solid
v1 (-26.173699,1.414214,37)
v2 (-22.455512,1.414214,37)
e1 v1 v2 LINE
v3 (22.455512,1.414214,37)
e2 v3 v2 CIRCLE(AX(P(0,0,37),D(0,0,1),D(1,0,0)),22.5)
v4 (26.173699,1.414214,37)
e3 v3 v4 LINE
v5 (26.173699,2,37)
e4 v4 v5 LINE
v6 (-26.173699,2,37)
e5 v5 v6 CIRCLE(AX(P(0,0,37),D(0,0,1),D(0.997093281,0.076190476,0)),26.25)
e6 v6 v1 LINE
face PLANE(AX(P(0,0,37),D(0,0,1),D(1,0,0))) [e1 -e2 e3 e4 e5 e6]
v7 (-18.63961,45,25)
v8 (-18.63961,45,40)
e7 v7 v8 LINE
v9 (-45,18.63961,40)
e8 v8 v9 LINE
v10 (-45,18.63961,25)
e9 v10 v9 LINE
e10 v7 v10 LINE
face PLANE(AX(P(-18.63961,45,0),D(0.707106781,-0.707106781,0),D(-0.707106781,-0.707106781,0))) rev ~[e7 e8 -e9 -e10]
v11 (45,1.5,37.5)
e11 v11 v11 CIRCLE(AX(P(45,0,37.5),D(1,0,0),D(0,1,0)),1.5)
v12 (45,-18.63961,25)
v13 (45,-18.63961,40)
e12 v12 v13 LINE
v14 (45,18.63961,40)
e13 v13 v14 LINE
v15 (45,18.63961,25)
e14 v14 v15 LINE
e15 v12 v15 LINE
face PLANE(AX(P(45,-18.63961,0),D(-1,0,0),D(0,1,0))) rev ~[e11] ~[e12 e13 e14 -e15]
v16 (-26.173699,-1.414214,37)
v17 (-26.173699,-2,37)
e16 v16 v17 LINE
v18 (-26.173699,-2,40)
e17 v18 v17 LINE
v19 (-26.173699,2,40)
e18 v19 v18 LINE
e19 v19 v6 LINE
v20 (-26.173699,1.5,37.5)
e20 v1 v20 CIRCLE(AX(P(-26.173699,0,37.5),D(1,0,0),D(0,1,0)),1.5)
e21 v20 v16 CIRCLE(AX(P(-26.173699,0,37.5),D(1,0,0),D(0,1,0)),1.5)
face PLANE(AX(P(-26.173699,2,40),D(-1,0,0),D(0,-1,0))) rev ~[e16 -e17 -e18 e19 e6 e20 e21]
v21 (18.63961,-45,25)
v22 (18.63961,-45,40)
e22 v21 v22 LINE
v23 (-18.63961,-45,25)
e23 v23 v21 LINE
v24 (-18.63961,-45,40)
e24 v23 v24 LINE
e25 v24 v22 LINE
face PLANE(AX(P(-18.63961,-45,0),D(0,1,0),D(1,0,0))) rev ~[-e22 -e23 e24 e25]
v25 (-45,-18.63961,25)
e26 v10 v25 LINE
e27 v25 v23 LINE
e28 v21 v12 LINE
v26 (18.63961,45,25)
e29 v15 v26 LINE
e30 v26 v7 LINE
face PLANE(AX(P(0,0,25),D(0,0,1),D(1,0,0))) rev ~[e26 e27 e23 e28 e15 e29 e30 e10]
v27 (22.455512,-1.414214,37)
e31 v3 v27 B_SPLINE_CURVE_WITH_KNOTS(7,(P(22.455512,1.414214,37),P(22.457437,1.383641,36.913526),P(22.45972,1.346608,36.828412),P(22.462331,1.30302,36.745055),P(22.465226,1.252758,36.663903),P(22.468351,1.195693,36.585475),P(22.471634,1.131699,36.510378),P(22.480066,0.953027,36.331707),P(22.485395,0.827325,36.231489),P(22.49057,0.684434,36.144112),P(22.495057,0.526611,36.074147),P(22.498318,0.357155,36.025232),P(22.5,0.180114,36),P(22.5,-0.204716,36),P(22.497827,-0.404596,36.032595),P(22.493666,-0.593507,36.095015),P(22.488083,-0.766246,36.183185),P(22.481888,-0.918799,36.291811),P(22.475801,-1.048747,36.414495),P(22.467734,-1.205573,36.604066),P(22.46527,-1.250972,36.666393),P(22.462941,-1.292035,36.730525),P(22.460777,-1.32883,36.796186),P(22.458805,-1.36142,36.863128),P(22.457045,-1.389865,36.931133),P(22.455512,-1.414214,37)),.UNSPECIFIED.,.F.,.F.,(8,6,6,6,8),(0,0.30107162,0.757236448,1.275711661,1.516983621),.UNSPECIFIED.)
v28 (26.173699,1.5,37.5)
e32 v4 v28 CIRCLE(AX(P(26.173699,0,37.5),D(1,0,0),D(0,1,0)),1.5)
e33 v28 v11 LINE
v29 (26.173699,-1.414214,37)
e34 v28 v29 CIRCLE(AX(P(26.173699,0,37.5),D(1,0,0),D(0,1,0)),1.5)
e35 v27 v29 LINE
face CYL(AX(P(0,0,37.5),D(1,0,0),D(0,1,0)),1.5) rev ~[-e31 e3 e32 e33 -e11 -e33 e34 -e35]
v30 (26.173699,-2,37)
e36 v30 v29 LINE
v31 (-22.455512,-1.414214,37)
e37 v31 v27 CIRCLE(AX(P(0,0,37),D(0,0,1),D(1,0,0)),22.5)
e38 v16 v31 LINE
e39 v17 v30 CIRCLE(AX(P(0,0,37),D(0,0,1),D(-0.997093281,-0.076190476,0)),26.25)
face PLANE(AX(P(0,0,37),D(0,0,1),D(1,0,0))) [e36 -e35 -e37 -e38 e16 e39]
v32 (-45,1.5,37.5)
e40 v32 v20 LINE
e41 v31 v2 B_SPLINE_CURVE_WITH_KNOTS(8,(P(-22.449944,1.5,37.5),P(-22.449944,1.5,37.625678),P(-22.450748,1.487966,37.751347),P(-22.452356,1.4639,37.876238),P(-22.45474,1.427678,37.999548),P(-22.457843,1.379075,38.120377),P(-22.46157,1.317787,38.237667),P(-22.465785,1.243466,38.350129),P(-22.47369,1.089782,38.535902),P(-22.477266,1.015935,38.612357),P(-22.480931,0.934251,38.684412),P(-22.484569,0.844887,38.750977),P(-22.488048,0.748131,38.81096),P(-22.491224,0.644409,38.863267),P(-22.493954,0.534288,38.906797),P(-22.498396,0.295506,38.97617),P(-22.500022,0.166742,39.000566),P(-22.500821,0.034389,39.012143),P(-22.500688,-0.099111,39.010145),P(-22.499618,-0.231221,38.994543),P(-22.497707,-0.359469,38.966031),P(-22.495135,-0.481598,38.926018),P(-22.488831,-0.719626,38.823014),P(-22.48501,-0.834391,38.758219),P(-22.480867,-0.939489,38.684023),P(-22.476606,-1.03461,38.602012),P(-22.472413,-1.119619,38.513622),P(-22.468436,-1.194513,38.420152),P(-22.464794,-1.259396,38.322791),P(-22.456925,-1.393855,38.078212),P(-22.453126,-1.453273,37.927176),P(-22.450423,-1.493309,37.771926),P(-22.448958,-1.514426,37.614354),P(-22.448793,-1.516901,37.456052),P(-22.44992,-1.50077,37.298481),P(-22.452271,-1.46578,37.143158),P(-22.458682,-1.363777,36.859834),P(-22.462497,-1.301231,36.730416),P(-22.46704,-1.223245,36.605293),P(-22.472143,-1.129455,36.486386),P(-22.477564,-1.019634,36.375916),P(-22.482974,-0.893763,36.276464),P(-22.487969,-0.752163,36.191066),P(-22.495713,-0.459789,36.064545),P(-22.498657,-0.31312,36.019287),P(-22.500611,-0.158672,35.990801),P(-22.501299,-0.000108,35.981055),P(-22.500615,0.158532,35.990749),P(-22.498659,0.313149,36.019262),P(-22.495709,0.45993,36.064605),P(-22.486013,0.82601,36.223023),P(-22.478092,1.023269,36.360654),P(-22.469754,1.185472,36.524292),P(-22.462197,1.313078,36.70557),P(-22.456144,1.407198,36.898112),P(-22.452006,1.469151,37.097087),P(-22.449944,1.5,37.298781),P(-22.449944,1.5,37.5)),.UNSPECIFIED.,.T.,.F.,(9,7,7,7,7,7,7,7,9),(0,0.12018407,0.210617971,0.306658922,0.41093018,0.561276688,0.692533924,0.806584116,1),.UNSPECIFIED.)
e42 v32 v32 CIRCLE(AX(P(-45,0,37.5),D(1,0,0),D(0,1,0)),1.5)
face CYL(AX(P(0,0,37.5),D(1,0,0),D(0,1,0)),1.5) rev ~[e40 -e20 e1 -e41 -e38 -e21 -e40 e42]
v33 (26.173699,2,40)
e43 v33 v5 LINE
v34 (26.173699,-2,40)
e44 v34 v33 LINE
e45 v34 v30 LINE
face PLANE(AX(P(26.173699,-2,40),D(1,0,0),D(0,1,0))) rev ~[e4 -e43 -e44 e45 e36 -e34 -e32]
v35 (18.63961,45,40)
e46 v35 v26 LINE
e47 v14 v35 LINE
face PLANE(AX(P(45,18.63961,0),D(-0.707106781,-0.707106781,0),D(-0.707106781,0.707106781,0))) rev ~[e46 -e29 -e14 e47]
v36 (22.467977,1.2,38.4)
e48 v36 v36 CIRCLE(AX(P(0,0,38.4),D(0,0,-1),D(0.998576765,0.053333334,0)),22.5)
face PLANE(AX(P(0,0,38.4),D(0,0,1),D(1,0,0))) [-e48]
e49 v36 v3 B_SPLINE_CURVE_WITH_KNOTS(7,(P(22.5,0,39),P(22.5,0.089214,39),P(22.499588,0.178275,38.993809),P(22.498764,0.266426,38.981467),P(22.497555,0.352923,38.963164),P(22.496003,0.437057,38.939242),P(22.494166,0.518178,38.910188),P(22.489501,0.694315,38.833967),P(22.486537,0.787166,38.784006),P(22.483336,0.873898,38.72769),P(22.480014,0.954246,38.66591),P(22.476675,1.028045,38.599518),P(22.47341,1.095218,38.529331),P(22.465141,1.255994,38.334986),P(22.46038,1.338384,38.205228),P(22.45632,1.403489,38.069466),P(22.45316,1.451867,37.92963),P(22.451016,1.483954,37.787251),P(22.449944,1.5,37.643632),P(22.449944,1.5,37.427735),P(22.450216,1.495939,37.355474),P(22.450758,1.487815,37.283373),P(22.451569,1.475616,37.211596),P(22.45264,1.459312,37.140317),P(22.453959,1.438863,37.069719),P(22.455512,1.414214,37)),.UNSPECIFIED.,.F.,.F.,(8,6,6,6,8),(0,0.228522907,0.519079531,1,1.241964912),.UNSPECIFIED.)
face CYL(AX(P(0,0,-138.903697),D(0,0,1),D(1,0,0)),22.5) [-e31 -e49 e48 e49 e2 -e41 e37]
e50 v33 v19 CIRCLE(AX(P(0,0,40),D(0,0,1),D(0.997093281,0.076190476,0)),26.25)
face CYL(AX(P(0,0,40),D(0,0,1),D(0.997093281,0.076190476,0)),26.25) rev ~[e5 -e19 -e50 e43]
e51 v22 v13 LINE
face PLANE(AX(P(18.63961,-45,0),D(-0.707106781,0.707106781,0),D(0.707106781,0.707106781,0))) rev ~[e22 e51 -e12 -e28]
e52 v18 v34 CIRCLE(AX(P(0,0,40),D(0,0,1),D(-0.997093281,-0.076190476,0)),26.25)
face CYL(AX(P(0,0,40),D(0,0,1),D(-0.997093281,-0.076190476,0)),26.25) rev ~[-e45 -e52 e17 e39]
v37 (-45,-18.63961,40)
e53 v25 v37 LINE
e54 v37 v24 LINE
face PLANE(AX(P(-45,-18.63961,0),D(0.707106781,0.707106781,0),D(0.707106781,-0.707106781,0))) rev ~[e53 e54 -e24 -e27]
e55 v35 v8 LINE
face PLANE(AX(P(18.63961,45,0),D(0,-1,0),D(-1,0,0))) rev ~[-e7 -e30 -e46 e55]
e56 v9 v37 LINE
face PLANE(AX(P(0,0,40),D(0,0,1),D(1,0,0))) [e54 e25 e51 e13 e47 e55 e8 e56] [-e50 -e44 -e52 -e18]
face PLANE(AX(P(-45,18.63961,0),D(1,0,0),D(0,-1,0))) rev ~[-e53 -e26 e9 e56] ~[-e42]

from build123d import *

# Parameters (mm, degrees)
F1_DEPTH       = 40
F2_R           = 22.5
F3_DEPTH       = 3
F5_DEPTH       = 25
F6_DEPTH       = 25
F7_DEPTH       = 25
F8_R           = 1.5
F9_DEPTH       = 110
F10_END_RADIUS = 22.5
F10_REACH      = 49.2436407871
F11_END_RADIUS = 22.5
F11_REACH      = 49.2436407871
F12_DEPTH      = 1.6


with BuildPart() as f1:
    # F0 (on Top) → F1 (new body)
    with BuildSketch(Plane.XY):
        Polygon((18.6396103068, 45), (-18.6396103068, 45), (-45, 18.6396103068), (-45, -18.6396103068), (-18.6396103068, -45), (18.6396103068, -45), (45, -18.6396103068), (45, 18.6396103068), align=None)
    extrude(amount=F1_DEPTH)

    # F2 (on face) → F3 (cut)
    with BuildSketch(Plane.XY.offset(40)):
        with BuildLine():
            Line((-26.1736986305, 2), (-26.1736986305, -2))
            ThreePointArc((-26.1736986305, -2), (0, -26.25), (26.1736986305, -2))
            Line((26.1736986305, -2), (26.1736986305, 2))
            ThreePointArc((26.1736986305, 2), (0, 26.25), (-26.1736986305, 2))
        make_face()
        Circle(F2_R, mode=Mode.SUBTRACT)
    extrude(amount=-F3_DEPTH, mode=Mode.SUBTRACT)

    # F4 (on face) → F5 (join)
    with BuildSketch(Plane.XY):
        Polygon((-18.6396103068, -45), (18.6396103068, -45), (45, -18.6396103068), (45, 18.6396103068), (18.6396103068, 45), (-18.6396103068, 45), (-45, 18.6396103068), (-45, -18.6396103068), align=None)
    extrude(amount=F5_DEPTH)

    # F0 (on Top) → F6 (join)
    with BuildSketch(Plane.XY):
        Polygon((18.6396103068, 45), (-18.6396103068, 45), (-45, 18.6396103068), (-45, -18.6396103068), (-18.6396103068, -45), (18.6396103068, -45), (45, -18.6396103068), (45, 18.6396103068), align=None)
    extrude(amount=F6_DEPTH)

    # F0 (on Top) → F7 (cut)
    with BuildSketch(Plane.XY):
        Polygon((18.6396103068, 45), (-18.6396103068, 45), (-45, 18.6396103068), (-45, -18.6396103068), (-18.6396103068, -45), (18.6396103068, -45), (45, -18.6396103068), (45, 18.6396103068), align=None)
    extrude(amount=F7_DEPTH, mode=Mode.SUBTRACT)

    # F8 (on Right) → F9 (cut, symmetric)
    with BuildSketch(Plane.YZ):
        with Locations((0, 37.5)):
            Circle(F8_R)
    extrude(amount=F9_DEPTH, both=True, mode=Mode.SUBTRACT)

    f10_end = (Plane.XY.offset(38.5) * Cylinder(F10_END_RADIUS, 354.8073942381, mode=Mode.PRIVATE)).faces().sort_by_distance((-22.5, 0, 39.3628971796))[0]
    # F8 (on Right) → F10 (join, up to the whole of a round face its end follows)
    with BuildSketch(Plane.YZ):
        with Locations((0, 37.5)):
            Circle(F8_R)
    f10_long = extrude(amount=F10_REACH, mode=Mode.PRIVATE)
    add(split(f10_long, bisect_by=f10_end, keep=Keep.BOTTOM, mode=Mode.PRIVATE))

    f11_end = (Plane.XY.offset(38.5) * Cylinder(F11_END_RADIUS, 354.8073942381, mode=Mode.PRIVATE)).faces().sort_by_distance((-22.5, 0, 39.3628971796))[0]
    # F8 (on Right) → F11 (join, up to the whole of a round face its end follows)
    with BuildSketch(Plane.YZ):
        with Locations((0, 37.5)):
            Circle(F8_R)
    f11_long = extrude(amount=-F11_REACH, mode=Mode.PRIVATE)
    add(split(f11_long, bisect_by=f11_end, keep=Keep.BOTTOM, mode=Mode.PRIVATE))

    # F12 (cut): a face of the model
    f12_faces = [f1.faces().sort_by_distance(p)[0] for p in [
        (0, 0, 40),
    ]]
    extrude(f12_faces, amount=-F12_DEPTH, mode=Mode.SUBTRACT)


solid = f1.part
